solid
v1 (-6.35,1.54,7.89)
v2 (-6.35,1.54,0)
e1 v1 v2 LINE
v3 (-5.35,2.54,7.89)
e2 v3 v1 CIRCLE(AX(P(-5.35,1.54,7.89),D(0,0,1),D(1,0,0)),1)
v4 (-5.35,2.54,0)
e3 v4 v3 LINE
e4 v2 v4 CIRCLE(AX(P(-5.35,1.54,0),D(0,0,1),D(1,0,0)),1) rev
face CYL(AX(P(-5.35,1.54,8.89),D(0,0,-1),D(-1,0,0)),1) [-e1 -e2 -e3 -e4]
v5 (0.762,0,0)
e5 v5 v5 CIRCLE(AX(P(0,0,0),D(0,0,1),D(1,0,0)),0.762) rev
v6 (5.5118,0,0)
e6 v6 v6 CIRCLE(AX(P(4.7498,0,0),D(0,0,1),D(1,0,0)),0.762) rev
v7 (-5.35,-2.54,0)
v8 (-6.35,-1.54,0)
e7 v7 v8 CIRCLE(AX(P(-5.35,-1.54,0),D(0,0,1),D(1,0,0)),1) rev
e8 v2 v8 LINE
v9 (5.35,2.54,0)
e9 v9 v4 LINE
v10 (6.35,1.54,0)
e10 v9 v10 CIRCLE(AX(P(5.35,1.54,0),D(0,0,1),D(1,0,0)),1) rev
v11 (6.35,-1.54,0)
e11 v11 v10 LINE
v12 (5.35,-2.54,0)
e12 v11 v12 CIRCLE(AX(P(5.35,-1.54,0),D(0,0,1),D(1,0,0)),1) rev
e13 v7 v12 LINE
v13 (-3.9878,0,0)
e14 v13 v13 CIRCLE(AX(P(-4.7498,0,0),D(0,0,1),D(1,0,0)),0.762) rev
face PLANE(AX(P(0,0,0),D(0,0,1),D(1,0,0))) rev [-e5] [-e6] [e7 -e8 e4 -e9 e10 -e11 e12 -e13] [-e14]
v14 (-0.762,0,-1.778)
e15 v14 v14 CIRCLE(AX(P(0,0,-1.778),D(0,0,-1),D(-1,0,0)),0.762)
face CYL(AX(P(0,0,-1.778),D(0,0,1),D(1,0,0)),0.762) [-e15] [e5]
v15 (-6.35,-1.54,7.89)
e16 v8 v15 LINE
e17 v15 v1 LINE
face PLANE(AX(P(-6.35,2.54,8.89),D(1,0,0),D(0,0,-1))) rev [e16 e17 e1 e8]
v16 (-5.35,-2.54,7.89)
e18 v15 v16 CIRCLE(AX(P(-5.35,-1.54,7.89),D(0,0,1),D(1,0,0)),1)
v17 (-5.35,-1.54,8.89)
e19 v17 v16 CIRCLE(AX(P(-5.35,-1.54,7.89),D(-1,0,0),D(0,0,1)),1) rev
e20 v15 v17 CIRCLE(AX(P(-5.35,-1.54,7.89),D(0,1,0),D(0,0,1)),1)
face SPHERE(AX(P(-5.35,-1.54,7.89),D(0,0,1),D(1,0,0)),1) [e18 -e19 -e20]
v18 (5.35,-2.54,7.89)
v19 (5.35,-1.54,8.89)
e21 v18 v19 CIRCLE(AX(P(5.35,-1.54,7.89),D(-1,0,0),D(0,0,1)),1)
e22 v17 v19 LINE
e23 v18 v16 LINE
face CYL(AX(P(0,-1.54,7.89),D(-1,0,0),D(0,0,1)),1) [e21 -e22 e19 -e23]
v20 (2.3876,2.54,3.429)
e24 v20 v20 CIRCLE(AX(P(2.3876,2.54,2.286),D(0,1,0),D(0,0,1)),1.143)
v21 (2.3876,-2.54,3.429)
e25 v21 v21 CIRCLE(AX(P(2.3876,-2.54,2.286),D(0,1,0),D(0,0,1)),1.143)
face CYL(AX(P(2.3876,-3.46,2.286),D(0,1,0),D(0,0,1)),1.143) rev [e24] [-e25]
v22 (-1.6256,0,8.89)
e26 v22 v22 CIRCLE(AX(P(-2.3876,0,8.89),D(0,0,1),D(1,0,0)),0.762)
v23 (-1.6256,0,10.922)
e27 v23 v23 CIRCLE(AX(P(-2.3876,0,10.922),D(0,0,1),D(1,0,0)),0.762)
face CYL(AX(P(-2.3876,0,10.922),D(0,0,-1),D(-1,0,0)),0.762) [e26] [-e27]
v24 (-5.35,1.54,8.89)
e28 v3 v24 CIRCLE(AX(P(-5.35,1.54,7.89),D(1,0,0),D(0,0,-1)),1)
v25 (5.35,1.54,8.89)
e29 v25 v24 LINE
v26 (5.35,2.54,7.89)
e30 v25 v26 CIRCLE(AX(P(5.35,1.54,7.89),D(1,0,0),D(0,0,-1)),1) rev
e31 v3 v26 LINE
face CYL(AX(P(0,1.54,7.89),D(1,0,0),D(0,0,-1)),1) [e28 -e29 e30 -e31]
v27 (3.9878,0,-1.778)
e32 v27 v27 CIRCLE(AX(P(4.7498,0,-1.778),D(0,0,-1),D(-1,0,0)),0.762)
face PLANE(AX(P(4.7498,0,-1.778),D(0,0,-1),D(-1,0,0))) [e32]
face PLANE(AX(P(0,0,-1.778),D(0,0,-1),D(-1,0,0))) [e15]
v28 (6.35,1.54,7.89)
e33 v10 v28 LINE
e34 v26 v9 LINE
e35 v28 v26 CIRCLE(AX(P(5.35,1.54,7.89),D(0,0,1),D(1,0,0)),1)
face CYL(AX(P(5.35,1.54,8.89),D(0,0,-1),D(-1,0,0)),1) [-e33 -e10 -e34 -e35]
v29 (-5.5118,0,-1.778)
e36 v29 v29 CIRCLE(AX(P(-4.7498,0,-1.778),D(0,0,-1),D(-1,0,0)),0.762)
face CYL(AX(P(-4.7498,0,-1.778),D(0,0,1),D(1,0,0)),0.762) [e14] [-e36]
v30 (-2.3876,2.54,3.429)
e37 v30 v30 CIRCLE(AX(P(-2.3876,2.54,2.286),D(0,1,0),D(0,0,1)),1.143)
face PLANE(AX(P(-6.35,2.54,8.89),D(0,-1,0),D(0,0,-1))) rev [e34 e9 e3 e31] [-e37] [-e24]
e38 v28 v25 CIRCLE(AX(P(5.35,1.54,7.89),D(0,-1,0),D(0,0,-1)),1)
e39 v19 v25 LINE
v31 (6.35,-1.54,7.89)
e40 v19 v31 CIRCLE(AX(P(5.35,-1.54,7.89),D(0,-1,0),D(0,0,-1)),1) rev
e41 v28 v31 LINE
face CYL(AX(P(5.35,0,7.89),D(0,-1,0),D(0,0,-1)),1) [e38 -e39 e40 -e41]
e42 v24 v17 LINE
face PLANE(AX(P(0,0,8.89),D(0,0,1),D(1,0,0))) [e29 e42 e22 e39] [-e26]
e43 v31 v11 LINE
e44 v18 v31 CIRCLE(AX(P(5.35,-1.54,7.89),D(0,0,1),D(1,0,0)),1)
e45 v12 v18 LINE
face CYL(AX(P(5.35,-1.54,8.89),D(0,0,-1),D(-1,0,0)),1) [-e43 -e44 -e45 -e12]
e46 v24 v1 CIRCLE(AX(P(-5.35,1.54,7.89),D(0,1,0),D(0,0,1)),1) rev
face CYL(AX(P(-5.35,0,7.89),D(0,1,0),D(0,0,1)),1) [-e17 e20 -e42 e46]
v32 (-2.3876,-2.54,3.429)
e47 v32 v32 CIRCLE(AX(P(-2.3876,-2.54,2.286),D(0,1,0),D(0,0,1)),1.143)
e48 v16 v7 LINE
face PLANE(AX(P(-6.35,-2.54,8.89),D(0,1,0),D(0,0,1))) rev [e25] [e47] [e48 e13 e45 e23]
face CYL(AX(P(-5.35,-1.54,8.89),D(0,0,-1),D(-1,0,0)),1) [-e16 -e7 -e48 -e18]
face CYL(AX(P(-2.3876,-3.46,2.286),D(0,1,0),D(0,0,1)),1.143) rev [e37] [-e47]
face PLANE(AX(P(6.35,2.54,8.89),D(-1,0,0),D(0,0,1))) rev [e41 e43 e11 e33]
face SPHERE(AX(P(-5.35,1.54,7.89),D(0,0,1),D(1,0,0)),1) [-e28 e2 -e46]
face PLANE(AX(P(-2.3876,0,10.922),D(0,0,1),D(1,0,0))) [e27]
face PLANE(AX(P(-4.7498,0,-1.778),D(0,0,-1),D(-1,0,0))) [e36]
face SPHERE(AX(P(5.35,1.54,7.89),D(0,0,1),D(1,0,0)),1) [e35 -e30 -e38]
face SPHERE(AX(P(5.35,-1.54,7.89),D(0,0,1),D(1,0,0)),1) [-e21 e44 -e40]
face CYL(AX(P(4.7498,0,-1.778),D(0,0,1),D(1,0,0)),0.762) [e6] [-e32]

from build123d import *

# Parameters (mm, degrees)
SKETCH_1_W          = 12.7
SKETCH_1_H          = 5.08
EXTRUDE_1_DEPTH     = 8.89
SKETCH_2_R          = 0.762
EXTRUDE_2_DEPTH     = 1.778
SKETCH_3_R          = 0.762
EXTRUDE_3_DEPTH     = 2.032
FILLET_2_R          = 1
FILLET_3_R          = 1
SKETCH_4_R          = 1.143
CUT_EXTRUDE_1_DEPTH = 6


with BuildPart() as part:
    # Эскиз1 → Бобышка-Вытянуть1 (new body)
    with BuildSketch(Plane.XY):
        Rectangle(SKETCH_1_W, SKETCH_1_H)
    extrude(amount=EXTRUDE_1_DEPTH)

    # Эскиз2 → Бобышка-Вытянуть2 (add)
    with BuildSketch(Plane(origin=(0, 0, 0), x_dir=(-1, 0, 0), z_dir=(0, 0, -1))):
        with Locations(Location((-4.7498, 0, 0), (0, 0, 180))):
            Circle(SKETCH_2_R)
        with Locations(Location((0, 0, 0), (0, 0, 180))):
            Circle(SKETCH_2_R)
        with Locations(Location((4.7498, 0, 0), (0, 0, 180))):
            Circle(SKETCH_2_R)
    extrude(amount=EXTRUDE_2_DEPTH)

    # Эскиз3 → Бобышка-Вытянуть3 (add)
    with BuildSketch(Plane.XY.offset(8.89)):
        with Locations((-2.3876, 0)):
            Circle(SKETCH_3_R)
    extrude(amount=EXTRUDE_3_DEPTH)

    # Скругление2
    fillet_2_edges = [part.edges().sort_by_distance(p)[0] for p in [
        (-6.35, 0, 8.89),
        (0, -2.54, 8.89),
        (6.35, 0, 8.89),
        (0, 2.54, 8.89),
    ]]
    fillet(fillet_2_edges, radius=FILLET_2_R)

    # Скругление3
    # the kernel refuses this fillet: 1 mm, written as the material it takes off along each edge
    with BuildSketch(Plane(origin=(5.35, 1.54, 7.89), x_dir=(1, 0, 0), z_dir=(0, 1, 0))) as fillet_3_piece_1_section:
        Polygon((0, 0), (FILLET_3_R, 0), (FILLET_3_R, -FILLET_3_R), (0, -FILLET_3_R), align=None)
    fillet_3_piece_1 = extrude(amount=FILLET_3_R, mode=Mode.PRIVATE)
    fillet_3_piece_1 = fillet_3_piece_1 - Plane(origin=(5.35, 1.54, 7.89), x_dir=(-0.7071067811865475, 0, -0.7071067811865475), z_dir=(0, 1, 0)) * Sphere(FILLET_3_R, mode=Mode.PRIVATE)
    add(fillet_3_piece_1, mode=Mode.SUBTRACT)
    with BuildSketch(Plane(origin=(5.35, -1.54, 7.89), x_dir=(0, -1, 0), z_dir=(1, 0, 0))) as fillet_3_piece_2_section:
        Polygon((0, 0), (FILLET_3_R, 0), (FILLET_3_R, -FILLET_3_R), (0, -FILLET_3_R), align=None)
    fillet_3_piece_2 = extrude(amount=FILLET_3_R, mode=Mode.PRIVATE)
    fillet_3_piece_2 = fillet_3_piece_2 - Plane(origin=(5.35, -1.54, 7.89), x_dir=(0, 0.7071067811865475, -0.7071067811865475), z_dir=(1, 0, 0)) * Sphere(FILLET_3_R, mode=Mode.PRIVATE)
    add(fillet_3_piece_2, mode=Mode.SUBTRACT)
    with BuildSketch(Plane(origin=(-5.35, 1.54, 7.89), x_dir=(-1, 0, 0), z_dir=(0, 1, 0))) as fillet_3_piece_3_section:
        Polygon((0, 0), (FILLET_3_R, 0), (FILLET_3_R, FILLET_3_R), (0, FILLET_3_R), align=None)
    fillet_3_piece_3 = extrude(amount=FILLET_3_R, mode=Mode.PRIVATE)
    fillet_3_piece_3 = fillet_3_piece_3 - Plane(origin=(-5.35, 1.54, 7.89), x_dir=(0.7071067811865475, 0, -0.7071067811865475), z_dir=(0, 1, 0)) * Sphere(FILLET_3_R, mode=Mode.PRIVATE)
    add(fillet_3_piece_3, mode=Mode.SUBTRACT)
    with BuildSketch(Plane(origin=(-5.35, -1.54, 7.89), x_dir=(0, -1, 0), z_dir=(-1, 0, 0))) as fillet_3_piece_4_section:
        Polygon((0, 0), (FILLET_3_R, 0), (FILLET_3_R, FILLET_3_R), (0, FILLET_3_R), align=None)
    fillet_3_piece_4 = extrude(amount=FILLET_3_R, mode=Mode.PRIVATE)
    fillet_3_piece_4 = fillet_3_piece_4 - Plane(origin=(-5.35, -1.54, 7.89), x_dir=(0, 0.7071067811865475, -0.7071067811865475), z_dir=(-1, 0, 0)) * Sphere(FILLET_3_R, mode=Mode.PRIVATE)
    add(fillet_3_piece_4, mode=Mode.SUBTRACT)
    with BuildSketch(Plane(origin=(-6.35, -2.54, -2.5), x_dir=(0, 1, 0), z_dir=(0, 0, 1)), Plane(origin=(-6.35, 2.54, -2.5), x_dir=(1, 0, 0), z_dir=(0, 0, 1))) as fillet_3_piece_5:
        with BuildLine():
            CenterArc((FILLET_3_R, -FILLET_3_R), FILLET_3_R, 90, 90)
            Line((0, -FILLET_3_R), (0, 0))
            Line((0, 0), (FILLET_3_R, 0))
        make_face()
    extrude(amount=10.39, mode=Mode.SUBTRACT)
    with BuildSketch(Plane(origin=(6.35, -2.54, -2.5), x_dir=(0, 1, 0), z_dir=(0, 0, 1)), Plane(origin=(6.35, 2.54, -2.5), x_dir=(-1, 0, 0), z_dir=(0, 0, 1))) as fillet_3_piece_6:
        with BuildLine():
            CenterArc((FILLET_3_R, FILLET_3_R), FILLET_3_R, 180, 90)
            Line((0, FILLET_3_R), (0, 0))
            Line((0, 0), (FILLET_3_R, 0))
        make_face()
    extrude(amount=10.39, mode=Mode.SUBTRACT)

    # Эскиз4 → Вырез-Вытянуть1 (cut)
    with BuildSketch(Plane(origin=(0, 2.54, 0), x_dir=(1, 0, 0), z_dir=(0, 1, 0))):
        with Locations(Location((-2.3876, -2.286, 0), (0, 0, 270))):
            Circle(SKETCH_4_R)
        with Locations(Location((2.3876, -2.286, 0), (0, 0, 270))):
            Circle(SKETCH_4_R)
    extrude(amount=-CUT_EXTRUDE_1_DEPTH, mode=Mode.SUBTRACT)


solid = part.part
